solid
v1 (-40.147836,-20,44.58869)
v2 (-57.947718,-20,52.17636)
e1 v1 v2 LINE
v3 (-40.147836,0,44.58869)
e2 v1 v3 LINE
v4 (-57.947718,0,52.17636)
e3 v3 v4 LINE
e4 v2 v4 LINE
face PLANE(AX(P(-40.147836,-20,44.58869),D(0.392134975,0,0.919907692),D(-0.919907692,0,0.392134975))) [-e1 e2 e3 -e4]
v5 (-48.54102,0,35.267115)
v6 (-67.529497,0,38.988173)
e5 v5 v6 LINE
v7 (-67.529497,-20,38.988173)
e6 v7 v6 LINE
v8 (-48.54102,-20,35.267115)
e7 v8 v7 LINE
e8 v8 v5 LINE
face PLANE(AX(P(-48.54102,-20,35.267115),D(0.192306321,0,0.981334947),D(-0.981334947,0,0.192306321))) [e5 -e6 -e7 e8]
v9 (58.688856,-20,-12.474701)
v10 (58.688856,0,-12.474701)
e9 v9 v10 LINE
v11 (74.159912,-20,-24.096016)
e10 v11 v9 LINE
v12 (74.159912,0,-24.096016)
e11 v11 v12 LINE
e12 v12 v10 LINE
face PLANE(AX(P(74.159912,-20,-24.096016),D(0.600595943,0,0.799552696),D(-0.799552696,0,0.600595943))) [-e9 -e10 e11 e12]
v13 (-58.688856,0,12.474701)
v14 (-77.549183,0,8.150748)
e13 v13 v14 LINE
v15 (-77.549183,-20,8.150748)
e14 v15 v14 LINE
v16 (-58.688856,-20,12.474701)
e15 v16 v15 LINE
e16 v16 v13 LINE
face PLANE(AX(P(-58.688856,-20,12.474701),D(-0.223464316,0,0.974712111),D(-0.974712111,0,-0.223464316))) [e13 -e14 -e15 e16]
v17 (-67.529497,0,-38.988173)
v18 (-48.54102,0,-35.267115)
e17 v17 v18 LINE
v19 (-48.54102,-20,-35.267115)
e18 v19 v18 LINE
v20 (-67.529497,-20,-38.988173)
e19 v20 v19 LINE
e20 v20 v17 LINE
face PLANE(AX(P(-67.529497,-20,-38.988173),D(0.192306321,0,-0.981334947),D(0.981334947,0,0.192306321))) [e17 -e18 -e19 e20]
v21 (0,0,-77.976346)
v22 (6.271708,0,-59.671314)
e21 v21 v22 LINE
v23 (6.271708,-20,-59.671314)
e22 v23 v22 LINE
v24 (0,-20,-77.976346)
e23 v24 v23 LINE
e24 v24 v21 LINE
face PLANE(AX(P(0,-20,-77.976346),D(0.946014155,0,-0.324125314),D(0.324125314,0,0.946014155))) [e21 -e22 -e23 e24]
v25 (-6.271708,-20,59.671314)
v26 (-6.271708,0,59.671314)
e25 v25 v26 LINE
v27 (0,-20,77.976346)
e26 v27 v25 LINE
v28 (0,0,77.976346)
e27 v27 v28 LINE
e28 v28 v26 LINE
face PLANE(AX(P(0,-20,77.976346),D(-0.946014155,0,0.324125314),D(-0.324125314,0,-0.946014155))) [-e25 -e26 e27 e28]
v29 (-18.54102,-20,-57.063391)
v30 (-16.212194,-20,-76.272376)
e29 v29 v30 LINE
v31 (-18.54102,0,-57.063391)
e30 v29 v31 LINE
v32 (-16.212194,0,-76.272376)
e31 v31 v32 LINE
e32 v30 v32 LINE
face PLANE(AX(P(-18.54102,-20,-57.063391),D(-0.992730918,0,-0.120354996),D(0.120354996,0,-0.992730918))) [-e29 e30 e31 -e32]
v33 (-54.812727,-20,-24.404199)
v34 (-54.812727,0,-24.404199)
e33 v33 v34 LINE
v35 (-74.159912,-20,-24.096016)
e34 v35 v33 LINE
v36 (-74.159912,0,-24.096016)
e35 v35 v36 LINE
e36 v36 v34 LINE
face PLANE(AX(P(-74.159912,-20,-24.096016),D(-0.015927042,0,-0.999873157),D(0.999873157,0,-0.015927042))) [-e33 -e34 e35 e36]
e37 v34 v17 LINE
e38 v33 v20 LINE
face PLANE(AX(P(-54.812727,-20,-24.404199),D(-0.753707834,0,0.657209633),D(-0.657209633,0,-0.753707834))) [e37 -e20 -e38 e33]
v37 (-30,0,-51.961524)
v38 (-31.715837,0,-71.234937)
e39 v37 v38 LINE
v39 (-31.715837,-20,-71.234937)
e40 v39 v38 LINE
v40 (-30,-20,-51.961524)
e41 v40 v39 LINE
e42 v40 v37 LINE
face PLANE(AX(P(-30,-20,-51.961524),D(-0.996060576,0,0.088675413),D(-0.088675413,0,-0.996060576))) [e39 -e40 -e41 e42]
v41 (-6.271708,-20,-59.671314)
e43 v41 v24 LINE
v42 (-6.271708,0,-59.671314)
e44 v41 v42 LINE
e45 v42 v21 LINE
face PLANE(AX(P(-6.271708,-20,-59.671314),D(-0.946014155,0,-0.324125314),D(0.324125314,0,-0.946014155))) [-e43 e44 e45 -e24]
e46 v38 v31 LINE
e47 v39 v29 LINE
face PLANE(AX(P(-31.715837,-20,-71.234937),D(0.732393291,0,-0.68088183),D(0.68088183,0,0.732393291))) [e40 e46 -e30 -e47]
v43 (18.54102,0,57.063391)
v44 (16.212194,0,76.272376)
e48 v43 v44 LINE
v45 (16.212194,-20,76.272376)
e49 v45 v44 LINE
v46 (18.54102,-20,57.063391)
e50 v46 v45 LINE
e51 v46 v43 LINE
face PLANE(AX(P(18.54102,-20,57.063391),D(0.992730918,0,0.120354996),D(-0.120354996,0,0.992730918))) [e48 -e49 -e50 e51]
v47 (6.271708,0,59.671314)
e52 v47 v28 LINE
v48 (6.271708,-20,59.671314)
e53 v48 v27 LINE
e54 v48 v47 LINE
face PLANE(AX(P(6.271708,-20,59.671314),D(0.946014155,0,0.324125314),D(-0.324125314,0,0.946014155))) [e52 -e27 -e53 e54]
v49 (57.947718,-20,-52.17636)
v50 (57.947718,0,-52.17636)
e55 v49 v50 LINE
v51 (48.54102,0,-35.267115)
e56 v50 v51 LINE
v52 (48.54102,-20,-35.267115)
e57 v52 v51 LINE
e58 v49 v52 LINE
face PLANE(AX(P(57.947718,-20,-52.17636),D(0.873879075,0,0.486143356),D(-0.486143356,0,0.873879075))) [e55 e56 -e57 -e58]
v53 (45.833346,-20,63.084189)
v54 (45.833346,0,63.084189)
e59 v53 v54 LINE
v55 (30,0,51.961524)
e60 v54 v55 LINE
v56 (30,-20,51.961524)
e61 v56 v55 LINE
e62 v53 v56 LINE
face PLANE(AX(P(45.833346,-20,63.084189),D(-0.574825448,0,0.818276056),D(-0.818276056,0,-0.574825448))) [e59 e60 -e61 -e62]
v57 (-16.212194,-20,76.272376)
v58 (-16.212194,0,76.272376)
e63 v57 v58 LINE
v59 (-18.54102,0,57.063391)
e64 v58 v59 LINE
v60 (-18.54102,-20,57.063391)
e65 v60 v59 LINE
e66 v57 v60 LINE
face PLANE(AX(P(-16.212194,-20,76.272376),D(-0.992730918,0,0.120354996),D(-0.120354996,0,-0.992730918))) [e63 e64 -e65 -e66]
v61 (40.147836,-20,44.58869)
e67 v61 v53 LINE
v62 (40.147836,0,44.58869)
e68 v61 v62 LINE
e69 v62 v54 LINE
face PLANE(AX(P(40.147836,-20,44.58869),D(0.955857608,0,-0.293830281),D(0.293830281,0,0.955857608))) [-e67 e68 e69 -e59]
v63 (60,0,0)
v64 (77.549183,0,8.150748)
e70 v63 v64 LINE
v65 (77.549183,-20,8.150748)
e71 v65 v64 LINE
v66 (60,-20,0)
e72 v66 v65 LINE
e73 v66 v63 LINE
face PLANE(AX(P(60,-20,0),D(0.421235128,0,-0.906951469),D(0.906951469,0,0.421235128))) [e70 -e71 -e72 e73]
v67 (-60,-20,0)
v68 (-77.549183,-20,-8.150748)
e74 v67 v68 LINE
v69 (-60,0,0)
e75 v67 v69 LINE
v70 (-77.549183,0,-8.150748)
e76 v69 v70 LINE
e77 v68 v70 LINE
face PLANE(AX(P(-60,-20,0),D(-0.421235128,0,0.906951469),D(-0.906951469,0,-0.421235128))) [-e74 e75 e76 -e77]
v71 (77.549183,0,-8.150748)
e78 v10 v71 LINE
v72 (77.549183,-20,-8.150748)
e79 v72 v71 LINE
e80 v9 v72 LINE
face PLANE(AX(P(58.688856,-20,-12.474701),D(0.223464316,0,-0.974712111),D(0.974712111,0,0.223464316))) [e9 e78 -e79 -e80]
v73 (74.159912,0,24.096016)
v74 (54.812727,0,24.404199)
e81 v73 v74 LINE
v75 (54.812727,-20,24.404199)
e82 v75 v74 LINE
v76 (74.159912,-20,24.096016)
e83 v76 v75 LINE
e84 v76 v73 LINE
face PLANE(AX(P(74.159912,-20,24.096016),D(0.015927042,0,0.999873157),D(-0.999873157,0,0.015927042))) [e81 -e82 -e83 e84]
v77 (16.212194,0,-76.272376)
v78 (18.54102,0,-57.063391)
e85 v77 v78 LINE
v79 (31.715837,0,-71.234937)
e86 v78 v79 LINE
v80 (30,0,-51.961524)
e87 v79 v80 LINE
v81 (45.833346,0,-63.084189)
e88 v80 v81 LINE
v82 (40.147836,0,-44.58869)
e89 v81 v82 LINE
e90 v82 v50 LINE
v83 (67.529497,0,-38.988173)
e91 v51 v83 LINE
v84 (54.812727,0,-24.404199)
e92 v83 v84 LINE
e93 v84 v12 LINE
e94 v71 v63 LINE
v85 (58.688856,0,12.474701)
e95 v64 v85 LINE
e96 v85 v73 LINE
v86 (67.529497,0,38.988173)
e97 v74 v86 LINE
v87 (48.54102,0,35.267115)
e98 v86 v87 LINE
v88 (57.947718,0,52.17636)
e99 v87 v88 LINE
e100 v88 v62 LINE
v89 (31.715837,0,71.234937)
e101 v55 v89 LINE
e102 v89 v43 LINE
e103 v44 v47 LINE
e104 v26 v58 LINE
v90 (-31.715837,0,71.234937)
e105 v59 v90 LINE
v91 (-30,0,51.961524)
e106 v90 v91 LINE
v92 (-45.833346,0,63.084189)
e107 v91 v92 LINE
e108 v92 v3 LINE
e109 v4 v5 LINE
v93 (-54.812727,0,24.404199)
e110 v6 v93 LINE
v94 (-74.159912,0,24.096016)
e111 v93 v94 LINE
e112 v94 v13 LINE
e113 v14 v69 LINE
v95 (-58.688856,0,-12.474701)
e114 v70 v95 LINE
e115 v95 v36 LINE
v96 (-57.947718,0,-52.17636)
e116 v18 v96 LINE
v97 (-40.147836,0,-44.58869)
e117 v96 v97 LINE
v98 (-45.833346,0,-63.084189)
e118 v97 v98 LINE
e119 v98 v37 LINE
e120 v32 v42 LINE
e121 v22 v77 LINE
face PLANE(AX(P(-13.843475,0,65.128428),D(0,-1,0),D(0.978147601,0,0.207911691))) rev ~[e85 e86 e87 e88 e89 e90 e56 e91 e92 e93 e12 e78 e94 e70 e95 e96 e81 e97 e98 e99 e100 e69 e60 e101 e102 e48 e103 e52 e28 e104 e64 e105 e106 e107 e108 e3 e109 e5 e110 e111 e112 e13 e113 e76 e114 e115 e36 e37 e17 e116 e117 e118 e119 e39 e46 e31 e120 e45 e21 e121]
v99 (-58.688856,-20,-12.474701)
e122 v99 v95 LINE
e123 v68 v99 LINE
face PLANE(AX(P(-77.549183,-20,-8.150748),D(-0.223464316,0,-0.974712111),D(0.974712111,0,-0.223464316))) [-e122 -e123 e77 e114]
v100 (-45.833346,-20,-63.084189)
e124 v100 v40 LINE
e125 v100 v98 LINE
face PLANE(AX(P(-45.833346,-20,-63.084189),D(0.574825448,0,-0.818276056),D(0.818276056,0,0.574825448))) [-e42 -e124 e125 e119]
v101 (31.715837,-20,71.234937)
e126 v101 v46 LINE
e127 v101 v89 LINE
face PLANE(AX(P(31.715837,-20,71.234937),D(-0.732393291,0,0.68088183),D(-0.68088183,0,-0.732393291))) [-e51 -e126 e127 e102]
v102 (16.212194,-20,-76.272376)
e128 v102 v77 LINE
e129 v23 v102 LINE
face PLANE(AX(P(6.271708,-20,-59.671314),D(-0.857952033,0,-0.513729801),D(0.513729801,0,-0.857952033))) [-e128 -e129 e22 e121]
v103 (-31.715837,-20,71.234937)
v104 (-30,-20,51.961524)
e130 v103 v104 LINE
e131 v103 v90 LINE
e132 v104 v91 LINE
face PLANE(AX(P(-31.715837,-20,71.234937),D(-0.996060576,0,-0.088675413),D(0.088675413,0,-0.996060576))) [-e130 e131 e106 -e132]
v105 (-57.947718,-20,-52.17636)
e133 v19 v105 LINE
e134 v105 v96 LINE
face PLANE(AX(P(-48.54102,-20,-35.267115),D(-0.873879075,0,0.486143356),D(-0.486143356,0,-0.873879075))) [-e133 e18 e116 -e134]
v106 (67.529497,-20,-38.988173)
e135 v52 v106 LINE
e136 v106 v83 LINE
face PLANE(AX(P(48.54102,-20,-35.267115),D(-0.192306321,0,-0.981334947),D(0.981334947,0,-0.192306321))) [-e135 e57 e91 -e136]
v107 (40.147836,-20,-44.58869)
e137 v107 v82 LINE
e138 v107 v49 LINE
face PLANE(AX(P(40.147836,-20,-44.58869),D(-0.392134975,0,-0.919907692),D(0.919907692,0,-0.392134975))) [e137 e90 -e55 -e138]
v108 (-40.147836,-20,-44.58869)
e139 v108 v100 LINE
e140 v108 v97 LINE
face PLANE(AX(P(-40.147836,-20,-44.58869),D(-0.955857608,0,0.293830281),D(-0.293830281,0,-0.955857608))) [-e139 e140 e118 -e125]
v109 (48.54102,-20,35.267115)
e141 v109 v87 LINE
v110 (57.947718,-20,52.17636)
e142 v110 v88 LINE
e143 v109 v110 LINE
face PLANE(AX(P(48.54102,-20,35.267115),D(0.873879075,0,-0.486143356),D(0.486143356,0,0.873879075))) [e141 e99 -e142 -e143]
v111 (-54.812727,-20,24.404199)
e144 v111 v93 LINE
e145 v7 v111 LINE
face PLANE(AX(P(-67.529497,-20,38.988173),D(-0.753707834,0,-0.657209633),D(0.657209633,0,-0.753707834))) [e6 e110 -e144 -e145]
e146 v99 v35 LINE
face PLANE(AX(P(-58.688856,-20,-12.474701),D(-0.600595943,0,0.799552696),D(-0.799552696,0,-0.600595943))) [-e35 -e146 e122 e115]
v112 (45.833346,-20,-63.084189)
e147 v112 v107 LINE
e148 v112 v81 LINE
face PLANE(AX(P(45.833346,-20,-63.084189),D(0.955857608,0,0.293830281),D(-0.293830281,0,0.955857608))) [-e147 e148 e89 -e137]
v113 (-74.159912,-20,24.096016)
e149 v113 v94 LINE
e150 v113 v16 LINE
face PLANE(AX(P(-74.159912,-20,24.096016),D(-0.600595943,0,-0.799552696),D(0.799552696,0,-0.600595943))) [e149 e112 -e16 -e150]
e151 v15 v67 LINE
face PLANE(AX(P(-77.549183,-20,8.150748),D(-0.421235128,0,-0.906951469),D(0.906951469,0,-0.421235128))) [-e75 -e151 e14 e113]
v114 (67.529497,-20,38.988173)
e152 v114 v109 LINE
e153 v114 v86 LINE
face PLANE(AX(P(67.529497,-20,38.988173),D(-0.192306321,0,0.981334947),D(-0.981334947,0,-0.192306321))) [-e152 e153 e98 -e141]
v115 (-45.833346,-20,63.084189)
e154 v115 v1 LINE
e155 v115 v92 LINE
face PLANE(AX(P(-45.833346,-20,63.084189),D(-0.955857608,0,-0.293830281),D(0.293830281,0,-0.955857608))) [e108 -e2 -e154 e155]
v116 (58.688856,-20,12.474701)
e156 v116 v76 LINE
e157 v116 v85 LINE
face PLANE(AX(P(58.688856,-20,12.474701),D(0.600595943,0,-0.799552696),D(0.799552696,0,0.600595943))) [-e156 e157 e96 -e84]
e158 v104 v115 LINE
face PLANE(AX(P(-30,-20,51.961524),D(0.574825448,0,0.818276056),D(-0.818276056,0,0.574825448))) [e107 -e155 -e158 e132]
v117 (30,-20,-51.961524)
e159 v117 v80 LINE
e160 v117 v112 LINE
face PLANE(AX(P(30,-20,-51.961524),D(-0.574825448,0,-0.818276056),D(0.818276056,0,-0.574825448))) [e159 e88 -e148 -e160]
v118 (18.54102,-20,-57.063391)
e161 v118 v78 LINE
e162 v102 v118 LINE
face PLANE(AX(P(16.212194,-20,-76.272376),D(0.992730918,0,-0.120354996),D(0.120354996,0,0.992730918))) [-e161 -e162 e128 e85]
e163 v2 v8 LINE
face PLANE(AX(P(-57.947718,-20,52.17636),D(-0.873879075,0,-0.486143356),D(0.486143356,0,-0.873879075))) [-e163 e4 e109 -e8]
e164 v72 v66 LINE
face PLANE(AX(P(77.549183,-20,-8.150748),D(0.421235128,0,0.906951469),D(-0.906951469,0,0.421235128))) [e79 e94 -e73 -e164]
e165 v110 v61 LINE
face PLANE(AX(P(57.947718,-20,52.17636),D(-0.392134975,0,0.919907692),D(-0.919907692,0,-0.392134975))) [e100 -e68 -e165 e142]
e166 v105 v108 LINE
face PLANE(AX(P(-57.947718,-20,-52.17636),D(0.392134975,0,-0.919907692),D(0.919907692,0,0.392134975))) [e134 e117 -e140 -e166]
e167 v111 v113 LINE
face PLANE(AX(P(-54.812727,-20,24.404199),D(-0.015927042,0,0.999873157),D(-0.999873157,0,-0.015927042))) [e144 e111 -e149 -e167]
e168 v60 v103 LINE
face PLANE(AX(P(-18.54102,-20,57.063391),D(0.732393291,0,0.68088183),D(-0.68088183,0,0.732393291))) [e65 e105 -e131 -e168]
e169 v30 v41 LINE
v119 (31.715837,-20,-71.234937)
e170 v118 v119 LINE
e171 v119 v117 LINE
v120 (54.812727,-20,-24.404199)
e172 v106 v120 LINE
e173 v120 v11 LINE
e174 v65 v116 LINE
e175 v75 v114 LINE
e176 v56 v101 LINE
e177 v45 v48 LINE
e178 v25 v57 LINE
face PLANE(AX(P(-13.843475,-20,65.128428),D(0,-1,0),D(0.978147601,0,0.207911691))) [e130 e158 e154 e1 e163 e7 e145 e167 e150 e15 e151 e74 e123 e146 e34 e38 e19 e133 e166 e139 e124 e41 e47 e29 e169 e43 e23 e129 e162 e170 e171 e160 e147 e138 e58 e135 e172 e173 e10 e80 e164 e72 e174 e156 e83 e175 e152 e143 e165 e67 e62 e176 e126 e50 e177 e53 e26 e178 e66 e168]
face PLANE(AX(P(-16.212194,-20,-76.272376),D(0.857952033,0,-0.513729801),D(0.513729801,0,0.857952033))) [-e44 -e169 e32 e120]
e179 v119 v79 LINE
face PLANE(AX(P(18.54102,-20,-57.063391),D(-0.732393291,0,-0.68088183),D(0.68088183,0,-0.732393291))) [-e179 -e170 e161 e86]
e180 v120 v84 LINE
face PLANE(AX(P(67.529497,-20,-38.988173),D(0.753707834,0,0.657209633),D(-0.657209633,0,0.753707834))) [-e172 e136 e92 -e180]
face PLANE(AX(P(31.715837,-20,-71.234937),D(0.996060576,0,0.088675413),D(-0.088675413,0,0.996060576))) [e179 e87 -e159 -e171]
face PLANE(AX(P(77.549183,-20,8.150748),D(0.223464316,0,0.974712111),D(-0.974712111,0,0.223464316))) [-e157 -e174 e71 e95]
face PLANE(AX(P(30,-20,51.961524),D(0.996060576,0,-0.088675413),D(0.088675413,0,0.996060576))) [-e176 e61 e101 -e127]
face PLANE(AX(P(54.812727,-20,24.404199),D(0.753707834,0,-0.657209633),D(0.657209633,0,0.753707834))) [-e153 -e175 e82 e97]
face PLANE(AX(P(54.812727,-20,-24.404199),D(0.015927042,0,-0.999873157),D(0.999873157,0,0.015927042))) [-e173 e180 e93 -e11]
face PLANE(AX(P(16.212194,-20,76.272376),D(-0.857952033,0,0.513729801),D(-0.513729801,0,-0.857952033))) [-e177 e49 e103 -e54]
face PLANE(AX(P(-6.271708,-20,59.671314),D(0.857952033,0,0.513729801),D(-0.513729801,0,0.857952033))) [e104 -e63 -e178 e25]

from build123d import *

# Parameters (mm, degrees)
F0_R            = 60
F1_DEPTH        = 20
F3_DEPTH        = 20
F3_COPIES_COUNT = 30


# Not quite as in the source:
# - a pattern or mirror of a feature is missing from the dataset's text; its kind, count and spacing are read off the source's solid


with BuildPart() as f1:
    # F0 (on Front) → F1 (new body)
    with BuildSketch(Plane.XZ):
        Circle(F0_R)
    extrude(amount=F1_DEPTH)

    # F2 (on face) → F3 (join)
    with BuildSketch(Plane.XZ.offset(20)):
        Polygon((0, 77.9763460159), (-6.2717077961, 59.6713137221), (6.2717077961, 59.6713137221), align=None)
    f3 = extrude(amount=-F3_DEPTH)

    # F3_copies: F3 ×30 about axis
    f3_copies_axis = Axis((0, 0, 0), (0, 1, 0))
    for i in range(1, F3_COPIES_COUNT):
        add(f3.rotate(f3_copies_axis, i * 360 / F3_COPIES_COUNT))


solid = f1.part
